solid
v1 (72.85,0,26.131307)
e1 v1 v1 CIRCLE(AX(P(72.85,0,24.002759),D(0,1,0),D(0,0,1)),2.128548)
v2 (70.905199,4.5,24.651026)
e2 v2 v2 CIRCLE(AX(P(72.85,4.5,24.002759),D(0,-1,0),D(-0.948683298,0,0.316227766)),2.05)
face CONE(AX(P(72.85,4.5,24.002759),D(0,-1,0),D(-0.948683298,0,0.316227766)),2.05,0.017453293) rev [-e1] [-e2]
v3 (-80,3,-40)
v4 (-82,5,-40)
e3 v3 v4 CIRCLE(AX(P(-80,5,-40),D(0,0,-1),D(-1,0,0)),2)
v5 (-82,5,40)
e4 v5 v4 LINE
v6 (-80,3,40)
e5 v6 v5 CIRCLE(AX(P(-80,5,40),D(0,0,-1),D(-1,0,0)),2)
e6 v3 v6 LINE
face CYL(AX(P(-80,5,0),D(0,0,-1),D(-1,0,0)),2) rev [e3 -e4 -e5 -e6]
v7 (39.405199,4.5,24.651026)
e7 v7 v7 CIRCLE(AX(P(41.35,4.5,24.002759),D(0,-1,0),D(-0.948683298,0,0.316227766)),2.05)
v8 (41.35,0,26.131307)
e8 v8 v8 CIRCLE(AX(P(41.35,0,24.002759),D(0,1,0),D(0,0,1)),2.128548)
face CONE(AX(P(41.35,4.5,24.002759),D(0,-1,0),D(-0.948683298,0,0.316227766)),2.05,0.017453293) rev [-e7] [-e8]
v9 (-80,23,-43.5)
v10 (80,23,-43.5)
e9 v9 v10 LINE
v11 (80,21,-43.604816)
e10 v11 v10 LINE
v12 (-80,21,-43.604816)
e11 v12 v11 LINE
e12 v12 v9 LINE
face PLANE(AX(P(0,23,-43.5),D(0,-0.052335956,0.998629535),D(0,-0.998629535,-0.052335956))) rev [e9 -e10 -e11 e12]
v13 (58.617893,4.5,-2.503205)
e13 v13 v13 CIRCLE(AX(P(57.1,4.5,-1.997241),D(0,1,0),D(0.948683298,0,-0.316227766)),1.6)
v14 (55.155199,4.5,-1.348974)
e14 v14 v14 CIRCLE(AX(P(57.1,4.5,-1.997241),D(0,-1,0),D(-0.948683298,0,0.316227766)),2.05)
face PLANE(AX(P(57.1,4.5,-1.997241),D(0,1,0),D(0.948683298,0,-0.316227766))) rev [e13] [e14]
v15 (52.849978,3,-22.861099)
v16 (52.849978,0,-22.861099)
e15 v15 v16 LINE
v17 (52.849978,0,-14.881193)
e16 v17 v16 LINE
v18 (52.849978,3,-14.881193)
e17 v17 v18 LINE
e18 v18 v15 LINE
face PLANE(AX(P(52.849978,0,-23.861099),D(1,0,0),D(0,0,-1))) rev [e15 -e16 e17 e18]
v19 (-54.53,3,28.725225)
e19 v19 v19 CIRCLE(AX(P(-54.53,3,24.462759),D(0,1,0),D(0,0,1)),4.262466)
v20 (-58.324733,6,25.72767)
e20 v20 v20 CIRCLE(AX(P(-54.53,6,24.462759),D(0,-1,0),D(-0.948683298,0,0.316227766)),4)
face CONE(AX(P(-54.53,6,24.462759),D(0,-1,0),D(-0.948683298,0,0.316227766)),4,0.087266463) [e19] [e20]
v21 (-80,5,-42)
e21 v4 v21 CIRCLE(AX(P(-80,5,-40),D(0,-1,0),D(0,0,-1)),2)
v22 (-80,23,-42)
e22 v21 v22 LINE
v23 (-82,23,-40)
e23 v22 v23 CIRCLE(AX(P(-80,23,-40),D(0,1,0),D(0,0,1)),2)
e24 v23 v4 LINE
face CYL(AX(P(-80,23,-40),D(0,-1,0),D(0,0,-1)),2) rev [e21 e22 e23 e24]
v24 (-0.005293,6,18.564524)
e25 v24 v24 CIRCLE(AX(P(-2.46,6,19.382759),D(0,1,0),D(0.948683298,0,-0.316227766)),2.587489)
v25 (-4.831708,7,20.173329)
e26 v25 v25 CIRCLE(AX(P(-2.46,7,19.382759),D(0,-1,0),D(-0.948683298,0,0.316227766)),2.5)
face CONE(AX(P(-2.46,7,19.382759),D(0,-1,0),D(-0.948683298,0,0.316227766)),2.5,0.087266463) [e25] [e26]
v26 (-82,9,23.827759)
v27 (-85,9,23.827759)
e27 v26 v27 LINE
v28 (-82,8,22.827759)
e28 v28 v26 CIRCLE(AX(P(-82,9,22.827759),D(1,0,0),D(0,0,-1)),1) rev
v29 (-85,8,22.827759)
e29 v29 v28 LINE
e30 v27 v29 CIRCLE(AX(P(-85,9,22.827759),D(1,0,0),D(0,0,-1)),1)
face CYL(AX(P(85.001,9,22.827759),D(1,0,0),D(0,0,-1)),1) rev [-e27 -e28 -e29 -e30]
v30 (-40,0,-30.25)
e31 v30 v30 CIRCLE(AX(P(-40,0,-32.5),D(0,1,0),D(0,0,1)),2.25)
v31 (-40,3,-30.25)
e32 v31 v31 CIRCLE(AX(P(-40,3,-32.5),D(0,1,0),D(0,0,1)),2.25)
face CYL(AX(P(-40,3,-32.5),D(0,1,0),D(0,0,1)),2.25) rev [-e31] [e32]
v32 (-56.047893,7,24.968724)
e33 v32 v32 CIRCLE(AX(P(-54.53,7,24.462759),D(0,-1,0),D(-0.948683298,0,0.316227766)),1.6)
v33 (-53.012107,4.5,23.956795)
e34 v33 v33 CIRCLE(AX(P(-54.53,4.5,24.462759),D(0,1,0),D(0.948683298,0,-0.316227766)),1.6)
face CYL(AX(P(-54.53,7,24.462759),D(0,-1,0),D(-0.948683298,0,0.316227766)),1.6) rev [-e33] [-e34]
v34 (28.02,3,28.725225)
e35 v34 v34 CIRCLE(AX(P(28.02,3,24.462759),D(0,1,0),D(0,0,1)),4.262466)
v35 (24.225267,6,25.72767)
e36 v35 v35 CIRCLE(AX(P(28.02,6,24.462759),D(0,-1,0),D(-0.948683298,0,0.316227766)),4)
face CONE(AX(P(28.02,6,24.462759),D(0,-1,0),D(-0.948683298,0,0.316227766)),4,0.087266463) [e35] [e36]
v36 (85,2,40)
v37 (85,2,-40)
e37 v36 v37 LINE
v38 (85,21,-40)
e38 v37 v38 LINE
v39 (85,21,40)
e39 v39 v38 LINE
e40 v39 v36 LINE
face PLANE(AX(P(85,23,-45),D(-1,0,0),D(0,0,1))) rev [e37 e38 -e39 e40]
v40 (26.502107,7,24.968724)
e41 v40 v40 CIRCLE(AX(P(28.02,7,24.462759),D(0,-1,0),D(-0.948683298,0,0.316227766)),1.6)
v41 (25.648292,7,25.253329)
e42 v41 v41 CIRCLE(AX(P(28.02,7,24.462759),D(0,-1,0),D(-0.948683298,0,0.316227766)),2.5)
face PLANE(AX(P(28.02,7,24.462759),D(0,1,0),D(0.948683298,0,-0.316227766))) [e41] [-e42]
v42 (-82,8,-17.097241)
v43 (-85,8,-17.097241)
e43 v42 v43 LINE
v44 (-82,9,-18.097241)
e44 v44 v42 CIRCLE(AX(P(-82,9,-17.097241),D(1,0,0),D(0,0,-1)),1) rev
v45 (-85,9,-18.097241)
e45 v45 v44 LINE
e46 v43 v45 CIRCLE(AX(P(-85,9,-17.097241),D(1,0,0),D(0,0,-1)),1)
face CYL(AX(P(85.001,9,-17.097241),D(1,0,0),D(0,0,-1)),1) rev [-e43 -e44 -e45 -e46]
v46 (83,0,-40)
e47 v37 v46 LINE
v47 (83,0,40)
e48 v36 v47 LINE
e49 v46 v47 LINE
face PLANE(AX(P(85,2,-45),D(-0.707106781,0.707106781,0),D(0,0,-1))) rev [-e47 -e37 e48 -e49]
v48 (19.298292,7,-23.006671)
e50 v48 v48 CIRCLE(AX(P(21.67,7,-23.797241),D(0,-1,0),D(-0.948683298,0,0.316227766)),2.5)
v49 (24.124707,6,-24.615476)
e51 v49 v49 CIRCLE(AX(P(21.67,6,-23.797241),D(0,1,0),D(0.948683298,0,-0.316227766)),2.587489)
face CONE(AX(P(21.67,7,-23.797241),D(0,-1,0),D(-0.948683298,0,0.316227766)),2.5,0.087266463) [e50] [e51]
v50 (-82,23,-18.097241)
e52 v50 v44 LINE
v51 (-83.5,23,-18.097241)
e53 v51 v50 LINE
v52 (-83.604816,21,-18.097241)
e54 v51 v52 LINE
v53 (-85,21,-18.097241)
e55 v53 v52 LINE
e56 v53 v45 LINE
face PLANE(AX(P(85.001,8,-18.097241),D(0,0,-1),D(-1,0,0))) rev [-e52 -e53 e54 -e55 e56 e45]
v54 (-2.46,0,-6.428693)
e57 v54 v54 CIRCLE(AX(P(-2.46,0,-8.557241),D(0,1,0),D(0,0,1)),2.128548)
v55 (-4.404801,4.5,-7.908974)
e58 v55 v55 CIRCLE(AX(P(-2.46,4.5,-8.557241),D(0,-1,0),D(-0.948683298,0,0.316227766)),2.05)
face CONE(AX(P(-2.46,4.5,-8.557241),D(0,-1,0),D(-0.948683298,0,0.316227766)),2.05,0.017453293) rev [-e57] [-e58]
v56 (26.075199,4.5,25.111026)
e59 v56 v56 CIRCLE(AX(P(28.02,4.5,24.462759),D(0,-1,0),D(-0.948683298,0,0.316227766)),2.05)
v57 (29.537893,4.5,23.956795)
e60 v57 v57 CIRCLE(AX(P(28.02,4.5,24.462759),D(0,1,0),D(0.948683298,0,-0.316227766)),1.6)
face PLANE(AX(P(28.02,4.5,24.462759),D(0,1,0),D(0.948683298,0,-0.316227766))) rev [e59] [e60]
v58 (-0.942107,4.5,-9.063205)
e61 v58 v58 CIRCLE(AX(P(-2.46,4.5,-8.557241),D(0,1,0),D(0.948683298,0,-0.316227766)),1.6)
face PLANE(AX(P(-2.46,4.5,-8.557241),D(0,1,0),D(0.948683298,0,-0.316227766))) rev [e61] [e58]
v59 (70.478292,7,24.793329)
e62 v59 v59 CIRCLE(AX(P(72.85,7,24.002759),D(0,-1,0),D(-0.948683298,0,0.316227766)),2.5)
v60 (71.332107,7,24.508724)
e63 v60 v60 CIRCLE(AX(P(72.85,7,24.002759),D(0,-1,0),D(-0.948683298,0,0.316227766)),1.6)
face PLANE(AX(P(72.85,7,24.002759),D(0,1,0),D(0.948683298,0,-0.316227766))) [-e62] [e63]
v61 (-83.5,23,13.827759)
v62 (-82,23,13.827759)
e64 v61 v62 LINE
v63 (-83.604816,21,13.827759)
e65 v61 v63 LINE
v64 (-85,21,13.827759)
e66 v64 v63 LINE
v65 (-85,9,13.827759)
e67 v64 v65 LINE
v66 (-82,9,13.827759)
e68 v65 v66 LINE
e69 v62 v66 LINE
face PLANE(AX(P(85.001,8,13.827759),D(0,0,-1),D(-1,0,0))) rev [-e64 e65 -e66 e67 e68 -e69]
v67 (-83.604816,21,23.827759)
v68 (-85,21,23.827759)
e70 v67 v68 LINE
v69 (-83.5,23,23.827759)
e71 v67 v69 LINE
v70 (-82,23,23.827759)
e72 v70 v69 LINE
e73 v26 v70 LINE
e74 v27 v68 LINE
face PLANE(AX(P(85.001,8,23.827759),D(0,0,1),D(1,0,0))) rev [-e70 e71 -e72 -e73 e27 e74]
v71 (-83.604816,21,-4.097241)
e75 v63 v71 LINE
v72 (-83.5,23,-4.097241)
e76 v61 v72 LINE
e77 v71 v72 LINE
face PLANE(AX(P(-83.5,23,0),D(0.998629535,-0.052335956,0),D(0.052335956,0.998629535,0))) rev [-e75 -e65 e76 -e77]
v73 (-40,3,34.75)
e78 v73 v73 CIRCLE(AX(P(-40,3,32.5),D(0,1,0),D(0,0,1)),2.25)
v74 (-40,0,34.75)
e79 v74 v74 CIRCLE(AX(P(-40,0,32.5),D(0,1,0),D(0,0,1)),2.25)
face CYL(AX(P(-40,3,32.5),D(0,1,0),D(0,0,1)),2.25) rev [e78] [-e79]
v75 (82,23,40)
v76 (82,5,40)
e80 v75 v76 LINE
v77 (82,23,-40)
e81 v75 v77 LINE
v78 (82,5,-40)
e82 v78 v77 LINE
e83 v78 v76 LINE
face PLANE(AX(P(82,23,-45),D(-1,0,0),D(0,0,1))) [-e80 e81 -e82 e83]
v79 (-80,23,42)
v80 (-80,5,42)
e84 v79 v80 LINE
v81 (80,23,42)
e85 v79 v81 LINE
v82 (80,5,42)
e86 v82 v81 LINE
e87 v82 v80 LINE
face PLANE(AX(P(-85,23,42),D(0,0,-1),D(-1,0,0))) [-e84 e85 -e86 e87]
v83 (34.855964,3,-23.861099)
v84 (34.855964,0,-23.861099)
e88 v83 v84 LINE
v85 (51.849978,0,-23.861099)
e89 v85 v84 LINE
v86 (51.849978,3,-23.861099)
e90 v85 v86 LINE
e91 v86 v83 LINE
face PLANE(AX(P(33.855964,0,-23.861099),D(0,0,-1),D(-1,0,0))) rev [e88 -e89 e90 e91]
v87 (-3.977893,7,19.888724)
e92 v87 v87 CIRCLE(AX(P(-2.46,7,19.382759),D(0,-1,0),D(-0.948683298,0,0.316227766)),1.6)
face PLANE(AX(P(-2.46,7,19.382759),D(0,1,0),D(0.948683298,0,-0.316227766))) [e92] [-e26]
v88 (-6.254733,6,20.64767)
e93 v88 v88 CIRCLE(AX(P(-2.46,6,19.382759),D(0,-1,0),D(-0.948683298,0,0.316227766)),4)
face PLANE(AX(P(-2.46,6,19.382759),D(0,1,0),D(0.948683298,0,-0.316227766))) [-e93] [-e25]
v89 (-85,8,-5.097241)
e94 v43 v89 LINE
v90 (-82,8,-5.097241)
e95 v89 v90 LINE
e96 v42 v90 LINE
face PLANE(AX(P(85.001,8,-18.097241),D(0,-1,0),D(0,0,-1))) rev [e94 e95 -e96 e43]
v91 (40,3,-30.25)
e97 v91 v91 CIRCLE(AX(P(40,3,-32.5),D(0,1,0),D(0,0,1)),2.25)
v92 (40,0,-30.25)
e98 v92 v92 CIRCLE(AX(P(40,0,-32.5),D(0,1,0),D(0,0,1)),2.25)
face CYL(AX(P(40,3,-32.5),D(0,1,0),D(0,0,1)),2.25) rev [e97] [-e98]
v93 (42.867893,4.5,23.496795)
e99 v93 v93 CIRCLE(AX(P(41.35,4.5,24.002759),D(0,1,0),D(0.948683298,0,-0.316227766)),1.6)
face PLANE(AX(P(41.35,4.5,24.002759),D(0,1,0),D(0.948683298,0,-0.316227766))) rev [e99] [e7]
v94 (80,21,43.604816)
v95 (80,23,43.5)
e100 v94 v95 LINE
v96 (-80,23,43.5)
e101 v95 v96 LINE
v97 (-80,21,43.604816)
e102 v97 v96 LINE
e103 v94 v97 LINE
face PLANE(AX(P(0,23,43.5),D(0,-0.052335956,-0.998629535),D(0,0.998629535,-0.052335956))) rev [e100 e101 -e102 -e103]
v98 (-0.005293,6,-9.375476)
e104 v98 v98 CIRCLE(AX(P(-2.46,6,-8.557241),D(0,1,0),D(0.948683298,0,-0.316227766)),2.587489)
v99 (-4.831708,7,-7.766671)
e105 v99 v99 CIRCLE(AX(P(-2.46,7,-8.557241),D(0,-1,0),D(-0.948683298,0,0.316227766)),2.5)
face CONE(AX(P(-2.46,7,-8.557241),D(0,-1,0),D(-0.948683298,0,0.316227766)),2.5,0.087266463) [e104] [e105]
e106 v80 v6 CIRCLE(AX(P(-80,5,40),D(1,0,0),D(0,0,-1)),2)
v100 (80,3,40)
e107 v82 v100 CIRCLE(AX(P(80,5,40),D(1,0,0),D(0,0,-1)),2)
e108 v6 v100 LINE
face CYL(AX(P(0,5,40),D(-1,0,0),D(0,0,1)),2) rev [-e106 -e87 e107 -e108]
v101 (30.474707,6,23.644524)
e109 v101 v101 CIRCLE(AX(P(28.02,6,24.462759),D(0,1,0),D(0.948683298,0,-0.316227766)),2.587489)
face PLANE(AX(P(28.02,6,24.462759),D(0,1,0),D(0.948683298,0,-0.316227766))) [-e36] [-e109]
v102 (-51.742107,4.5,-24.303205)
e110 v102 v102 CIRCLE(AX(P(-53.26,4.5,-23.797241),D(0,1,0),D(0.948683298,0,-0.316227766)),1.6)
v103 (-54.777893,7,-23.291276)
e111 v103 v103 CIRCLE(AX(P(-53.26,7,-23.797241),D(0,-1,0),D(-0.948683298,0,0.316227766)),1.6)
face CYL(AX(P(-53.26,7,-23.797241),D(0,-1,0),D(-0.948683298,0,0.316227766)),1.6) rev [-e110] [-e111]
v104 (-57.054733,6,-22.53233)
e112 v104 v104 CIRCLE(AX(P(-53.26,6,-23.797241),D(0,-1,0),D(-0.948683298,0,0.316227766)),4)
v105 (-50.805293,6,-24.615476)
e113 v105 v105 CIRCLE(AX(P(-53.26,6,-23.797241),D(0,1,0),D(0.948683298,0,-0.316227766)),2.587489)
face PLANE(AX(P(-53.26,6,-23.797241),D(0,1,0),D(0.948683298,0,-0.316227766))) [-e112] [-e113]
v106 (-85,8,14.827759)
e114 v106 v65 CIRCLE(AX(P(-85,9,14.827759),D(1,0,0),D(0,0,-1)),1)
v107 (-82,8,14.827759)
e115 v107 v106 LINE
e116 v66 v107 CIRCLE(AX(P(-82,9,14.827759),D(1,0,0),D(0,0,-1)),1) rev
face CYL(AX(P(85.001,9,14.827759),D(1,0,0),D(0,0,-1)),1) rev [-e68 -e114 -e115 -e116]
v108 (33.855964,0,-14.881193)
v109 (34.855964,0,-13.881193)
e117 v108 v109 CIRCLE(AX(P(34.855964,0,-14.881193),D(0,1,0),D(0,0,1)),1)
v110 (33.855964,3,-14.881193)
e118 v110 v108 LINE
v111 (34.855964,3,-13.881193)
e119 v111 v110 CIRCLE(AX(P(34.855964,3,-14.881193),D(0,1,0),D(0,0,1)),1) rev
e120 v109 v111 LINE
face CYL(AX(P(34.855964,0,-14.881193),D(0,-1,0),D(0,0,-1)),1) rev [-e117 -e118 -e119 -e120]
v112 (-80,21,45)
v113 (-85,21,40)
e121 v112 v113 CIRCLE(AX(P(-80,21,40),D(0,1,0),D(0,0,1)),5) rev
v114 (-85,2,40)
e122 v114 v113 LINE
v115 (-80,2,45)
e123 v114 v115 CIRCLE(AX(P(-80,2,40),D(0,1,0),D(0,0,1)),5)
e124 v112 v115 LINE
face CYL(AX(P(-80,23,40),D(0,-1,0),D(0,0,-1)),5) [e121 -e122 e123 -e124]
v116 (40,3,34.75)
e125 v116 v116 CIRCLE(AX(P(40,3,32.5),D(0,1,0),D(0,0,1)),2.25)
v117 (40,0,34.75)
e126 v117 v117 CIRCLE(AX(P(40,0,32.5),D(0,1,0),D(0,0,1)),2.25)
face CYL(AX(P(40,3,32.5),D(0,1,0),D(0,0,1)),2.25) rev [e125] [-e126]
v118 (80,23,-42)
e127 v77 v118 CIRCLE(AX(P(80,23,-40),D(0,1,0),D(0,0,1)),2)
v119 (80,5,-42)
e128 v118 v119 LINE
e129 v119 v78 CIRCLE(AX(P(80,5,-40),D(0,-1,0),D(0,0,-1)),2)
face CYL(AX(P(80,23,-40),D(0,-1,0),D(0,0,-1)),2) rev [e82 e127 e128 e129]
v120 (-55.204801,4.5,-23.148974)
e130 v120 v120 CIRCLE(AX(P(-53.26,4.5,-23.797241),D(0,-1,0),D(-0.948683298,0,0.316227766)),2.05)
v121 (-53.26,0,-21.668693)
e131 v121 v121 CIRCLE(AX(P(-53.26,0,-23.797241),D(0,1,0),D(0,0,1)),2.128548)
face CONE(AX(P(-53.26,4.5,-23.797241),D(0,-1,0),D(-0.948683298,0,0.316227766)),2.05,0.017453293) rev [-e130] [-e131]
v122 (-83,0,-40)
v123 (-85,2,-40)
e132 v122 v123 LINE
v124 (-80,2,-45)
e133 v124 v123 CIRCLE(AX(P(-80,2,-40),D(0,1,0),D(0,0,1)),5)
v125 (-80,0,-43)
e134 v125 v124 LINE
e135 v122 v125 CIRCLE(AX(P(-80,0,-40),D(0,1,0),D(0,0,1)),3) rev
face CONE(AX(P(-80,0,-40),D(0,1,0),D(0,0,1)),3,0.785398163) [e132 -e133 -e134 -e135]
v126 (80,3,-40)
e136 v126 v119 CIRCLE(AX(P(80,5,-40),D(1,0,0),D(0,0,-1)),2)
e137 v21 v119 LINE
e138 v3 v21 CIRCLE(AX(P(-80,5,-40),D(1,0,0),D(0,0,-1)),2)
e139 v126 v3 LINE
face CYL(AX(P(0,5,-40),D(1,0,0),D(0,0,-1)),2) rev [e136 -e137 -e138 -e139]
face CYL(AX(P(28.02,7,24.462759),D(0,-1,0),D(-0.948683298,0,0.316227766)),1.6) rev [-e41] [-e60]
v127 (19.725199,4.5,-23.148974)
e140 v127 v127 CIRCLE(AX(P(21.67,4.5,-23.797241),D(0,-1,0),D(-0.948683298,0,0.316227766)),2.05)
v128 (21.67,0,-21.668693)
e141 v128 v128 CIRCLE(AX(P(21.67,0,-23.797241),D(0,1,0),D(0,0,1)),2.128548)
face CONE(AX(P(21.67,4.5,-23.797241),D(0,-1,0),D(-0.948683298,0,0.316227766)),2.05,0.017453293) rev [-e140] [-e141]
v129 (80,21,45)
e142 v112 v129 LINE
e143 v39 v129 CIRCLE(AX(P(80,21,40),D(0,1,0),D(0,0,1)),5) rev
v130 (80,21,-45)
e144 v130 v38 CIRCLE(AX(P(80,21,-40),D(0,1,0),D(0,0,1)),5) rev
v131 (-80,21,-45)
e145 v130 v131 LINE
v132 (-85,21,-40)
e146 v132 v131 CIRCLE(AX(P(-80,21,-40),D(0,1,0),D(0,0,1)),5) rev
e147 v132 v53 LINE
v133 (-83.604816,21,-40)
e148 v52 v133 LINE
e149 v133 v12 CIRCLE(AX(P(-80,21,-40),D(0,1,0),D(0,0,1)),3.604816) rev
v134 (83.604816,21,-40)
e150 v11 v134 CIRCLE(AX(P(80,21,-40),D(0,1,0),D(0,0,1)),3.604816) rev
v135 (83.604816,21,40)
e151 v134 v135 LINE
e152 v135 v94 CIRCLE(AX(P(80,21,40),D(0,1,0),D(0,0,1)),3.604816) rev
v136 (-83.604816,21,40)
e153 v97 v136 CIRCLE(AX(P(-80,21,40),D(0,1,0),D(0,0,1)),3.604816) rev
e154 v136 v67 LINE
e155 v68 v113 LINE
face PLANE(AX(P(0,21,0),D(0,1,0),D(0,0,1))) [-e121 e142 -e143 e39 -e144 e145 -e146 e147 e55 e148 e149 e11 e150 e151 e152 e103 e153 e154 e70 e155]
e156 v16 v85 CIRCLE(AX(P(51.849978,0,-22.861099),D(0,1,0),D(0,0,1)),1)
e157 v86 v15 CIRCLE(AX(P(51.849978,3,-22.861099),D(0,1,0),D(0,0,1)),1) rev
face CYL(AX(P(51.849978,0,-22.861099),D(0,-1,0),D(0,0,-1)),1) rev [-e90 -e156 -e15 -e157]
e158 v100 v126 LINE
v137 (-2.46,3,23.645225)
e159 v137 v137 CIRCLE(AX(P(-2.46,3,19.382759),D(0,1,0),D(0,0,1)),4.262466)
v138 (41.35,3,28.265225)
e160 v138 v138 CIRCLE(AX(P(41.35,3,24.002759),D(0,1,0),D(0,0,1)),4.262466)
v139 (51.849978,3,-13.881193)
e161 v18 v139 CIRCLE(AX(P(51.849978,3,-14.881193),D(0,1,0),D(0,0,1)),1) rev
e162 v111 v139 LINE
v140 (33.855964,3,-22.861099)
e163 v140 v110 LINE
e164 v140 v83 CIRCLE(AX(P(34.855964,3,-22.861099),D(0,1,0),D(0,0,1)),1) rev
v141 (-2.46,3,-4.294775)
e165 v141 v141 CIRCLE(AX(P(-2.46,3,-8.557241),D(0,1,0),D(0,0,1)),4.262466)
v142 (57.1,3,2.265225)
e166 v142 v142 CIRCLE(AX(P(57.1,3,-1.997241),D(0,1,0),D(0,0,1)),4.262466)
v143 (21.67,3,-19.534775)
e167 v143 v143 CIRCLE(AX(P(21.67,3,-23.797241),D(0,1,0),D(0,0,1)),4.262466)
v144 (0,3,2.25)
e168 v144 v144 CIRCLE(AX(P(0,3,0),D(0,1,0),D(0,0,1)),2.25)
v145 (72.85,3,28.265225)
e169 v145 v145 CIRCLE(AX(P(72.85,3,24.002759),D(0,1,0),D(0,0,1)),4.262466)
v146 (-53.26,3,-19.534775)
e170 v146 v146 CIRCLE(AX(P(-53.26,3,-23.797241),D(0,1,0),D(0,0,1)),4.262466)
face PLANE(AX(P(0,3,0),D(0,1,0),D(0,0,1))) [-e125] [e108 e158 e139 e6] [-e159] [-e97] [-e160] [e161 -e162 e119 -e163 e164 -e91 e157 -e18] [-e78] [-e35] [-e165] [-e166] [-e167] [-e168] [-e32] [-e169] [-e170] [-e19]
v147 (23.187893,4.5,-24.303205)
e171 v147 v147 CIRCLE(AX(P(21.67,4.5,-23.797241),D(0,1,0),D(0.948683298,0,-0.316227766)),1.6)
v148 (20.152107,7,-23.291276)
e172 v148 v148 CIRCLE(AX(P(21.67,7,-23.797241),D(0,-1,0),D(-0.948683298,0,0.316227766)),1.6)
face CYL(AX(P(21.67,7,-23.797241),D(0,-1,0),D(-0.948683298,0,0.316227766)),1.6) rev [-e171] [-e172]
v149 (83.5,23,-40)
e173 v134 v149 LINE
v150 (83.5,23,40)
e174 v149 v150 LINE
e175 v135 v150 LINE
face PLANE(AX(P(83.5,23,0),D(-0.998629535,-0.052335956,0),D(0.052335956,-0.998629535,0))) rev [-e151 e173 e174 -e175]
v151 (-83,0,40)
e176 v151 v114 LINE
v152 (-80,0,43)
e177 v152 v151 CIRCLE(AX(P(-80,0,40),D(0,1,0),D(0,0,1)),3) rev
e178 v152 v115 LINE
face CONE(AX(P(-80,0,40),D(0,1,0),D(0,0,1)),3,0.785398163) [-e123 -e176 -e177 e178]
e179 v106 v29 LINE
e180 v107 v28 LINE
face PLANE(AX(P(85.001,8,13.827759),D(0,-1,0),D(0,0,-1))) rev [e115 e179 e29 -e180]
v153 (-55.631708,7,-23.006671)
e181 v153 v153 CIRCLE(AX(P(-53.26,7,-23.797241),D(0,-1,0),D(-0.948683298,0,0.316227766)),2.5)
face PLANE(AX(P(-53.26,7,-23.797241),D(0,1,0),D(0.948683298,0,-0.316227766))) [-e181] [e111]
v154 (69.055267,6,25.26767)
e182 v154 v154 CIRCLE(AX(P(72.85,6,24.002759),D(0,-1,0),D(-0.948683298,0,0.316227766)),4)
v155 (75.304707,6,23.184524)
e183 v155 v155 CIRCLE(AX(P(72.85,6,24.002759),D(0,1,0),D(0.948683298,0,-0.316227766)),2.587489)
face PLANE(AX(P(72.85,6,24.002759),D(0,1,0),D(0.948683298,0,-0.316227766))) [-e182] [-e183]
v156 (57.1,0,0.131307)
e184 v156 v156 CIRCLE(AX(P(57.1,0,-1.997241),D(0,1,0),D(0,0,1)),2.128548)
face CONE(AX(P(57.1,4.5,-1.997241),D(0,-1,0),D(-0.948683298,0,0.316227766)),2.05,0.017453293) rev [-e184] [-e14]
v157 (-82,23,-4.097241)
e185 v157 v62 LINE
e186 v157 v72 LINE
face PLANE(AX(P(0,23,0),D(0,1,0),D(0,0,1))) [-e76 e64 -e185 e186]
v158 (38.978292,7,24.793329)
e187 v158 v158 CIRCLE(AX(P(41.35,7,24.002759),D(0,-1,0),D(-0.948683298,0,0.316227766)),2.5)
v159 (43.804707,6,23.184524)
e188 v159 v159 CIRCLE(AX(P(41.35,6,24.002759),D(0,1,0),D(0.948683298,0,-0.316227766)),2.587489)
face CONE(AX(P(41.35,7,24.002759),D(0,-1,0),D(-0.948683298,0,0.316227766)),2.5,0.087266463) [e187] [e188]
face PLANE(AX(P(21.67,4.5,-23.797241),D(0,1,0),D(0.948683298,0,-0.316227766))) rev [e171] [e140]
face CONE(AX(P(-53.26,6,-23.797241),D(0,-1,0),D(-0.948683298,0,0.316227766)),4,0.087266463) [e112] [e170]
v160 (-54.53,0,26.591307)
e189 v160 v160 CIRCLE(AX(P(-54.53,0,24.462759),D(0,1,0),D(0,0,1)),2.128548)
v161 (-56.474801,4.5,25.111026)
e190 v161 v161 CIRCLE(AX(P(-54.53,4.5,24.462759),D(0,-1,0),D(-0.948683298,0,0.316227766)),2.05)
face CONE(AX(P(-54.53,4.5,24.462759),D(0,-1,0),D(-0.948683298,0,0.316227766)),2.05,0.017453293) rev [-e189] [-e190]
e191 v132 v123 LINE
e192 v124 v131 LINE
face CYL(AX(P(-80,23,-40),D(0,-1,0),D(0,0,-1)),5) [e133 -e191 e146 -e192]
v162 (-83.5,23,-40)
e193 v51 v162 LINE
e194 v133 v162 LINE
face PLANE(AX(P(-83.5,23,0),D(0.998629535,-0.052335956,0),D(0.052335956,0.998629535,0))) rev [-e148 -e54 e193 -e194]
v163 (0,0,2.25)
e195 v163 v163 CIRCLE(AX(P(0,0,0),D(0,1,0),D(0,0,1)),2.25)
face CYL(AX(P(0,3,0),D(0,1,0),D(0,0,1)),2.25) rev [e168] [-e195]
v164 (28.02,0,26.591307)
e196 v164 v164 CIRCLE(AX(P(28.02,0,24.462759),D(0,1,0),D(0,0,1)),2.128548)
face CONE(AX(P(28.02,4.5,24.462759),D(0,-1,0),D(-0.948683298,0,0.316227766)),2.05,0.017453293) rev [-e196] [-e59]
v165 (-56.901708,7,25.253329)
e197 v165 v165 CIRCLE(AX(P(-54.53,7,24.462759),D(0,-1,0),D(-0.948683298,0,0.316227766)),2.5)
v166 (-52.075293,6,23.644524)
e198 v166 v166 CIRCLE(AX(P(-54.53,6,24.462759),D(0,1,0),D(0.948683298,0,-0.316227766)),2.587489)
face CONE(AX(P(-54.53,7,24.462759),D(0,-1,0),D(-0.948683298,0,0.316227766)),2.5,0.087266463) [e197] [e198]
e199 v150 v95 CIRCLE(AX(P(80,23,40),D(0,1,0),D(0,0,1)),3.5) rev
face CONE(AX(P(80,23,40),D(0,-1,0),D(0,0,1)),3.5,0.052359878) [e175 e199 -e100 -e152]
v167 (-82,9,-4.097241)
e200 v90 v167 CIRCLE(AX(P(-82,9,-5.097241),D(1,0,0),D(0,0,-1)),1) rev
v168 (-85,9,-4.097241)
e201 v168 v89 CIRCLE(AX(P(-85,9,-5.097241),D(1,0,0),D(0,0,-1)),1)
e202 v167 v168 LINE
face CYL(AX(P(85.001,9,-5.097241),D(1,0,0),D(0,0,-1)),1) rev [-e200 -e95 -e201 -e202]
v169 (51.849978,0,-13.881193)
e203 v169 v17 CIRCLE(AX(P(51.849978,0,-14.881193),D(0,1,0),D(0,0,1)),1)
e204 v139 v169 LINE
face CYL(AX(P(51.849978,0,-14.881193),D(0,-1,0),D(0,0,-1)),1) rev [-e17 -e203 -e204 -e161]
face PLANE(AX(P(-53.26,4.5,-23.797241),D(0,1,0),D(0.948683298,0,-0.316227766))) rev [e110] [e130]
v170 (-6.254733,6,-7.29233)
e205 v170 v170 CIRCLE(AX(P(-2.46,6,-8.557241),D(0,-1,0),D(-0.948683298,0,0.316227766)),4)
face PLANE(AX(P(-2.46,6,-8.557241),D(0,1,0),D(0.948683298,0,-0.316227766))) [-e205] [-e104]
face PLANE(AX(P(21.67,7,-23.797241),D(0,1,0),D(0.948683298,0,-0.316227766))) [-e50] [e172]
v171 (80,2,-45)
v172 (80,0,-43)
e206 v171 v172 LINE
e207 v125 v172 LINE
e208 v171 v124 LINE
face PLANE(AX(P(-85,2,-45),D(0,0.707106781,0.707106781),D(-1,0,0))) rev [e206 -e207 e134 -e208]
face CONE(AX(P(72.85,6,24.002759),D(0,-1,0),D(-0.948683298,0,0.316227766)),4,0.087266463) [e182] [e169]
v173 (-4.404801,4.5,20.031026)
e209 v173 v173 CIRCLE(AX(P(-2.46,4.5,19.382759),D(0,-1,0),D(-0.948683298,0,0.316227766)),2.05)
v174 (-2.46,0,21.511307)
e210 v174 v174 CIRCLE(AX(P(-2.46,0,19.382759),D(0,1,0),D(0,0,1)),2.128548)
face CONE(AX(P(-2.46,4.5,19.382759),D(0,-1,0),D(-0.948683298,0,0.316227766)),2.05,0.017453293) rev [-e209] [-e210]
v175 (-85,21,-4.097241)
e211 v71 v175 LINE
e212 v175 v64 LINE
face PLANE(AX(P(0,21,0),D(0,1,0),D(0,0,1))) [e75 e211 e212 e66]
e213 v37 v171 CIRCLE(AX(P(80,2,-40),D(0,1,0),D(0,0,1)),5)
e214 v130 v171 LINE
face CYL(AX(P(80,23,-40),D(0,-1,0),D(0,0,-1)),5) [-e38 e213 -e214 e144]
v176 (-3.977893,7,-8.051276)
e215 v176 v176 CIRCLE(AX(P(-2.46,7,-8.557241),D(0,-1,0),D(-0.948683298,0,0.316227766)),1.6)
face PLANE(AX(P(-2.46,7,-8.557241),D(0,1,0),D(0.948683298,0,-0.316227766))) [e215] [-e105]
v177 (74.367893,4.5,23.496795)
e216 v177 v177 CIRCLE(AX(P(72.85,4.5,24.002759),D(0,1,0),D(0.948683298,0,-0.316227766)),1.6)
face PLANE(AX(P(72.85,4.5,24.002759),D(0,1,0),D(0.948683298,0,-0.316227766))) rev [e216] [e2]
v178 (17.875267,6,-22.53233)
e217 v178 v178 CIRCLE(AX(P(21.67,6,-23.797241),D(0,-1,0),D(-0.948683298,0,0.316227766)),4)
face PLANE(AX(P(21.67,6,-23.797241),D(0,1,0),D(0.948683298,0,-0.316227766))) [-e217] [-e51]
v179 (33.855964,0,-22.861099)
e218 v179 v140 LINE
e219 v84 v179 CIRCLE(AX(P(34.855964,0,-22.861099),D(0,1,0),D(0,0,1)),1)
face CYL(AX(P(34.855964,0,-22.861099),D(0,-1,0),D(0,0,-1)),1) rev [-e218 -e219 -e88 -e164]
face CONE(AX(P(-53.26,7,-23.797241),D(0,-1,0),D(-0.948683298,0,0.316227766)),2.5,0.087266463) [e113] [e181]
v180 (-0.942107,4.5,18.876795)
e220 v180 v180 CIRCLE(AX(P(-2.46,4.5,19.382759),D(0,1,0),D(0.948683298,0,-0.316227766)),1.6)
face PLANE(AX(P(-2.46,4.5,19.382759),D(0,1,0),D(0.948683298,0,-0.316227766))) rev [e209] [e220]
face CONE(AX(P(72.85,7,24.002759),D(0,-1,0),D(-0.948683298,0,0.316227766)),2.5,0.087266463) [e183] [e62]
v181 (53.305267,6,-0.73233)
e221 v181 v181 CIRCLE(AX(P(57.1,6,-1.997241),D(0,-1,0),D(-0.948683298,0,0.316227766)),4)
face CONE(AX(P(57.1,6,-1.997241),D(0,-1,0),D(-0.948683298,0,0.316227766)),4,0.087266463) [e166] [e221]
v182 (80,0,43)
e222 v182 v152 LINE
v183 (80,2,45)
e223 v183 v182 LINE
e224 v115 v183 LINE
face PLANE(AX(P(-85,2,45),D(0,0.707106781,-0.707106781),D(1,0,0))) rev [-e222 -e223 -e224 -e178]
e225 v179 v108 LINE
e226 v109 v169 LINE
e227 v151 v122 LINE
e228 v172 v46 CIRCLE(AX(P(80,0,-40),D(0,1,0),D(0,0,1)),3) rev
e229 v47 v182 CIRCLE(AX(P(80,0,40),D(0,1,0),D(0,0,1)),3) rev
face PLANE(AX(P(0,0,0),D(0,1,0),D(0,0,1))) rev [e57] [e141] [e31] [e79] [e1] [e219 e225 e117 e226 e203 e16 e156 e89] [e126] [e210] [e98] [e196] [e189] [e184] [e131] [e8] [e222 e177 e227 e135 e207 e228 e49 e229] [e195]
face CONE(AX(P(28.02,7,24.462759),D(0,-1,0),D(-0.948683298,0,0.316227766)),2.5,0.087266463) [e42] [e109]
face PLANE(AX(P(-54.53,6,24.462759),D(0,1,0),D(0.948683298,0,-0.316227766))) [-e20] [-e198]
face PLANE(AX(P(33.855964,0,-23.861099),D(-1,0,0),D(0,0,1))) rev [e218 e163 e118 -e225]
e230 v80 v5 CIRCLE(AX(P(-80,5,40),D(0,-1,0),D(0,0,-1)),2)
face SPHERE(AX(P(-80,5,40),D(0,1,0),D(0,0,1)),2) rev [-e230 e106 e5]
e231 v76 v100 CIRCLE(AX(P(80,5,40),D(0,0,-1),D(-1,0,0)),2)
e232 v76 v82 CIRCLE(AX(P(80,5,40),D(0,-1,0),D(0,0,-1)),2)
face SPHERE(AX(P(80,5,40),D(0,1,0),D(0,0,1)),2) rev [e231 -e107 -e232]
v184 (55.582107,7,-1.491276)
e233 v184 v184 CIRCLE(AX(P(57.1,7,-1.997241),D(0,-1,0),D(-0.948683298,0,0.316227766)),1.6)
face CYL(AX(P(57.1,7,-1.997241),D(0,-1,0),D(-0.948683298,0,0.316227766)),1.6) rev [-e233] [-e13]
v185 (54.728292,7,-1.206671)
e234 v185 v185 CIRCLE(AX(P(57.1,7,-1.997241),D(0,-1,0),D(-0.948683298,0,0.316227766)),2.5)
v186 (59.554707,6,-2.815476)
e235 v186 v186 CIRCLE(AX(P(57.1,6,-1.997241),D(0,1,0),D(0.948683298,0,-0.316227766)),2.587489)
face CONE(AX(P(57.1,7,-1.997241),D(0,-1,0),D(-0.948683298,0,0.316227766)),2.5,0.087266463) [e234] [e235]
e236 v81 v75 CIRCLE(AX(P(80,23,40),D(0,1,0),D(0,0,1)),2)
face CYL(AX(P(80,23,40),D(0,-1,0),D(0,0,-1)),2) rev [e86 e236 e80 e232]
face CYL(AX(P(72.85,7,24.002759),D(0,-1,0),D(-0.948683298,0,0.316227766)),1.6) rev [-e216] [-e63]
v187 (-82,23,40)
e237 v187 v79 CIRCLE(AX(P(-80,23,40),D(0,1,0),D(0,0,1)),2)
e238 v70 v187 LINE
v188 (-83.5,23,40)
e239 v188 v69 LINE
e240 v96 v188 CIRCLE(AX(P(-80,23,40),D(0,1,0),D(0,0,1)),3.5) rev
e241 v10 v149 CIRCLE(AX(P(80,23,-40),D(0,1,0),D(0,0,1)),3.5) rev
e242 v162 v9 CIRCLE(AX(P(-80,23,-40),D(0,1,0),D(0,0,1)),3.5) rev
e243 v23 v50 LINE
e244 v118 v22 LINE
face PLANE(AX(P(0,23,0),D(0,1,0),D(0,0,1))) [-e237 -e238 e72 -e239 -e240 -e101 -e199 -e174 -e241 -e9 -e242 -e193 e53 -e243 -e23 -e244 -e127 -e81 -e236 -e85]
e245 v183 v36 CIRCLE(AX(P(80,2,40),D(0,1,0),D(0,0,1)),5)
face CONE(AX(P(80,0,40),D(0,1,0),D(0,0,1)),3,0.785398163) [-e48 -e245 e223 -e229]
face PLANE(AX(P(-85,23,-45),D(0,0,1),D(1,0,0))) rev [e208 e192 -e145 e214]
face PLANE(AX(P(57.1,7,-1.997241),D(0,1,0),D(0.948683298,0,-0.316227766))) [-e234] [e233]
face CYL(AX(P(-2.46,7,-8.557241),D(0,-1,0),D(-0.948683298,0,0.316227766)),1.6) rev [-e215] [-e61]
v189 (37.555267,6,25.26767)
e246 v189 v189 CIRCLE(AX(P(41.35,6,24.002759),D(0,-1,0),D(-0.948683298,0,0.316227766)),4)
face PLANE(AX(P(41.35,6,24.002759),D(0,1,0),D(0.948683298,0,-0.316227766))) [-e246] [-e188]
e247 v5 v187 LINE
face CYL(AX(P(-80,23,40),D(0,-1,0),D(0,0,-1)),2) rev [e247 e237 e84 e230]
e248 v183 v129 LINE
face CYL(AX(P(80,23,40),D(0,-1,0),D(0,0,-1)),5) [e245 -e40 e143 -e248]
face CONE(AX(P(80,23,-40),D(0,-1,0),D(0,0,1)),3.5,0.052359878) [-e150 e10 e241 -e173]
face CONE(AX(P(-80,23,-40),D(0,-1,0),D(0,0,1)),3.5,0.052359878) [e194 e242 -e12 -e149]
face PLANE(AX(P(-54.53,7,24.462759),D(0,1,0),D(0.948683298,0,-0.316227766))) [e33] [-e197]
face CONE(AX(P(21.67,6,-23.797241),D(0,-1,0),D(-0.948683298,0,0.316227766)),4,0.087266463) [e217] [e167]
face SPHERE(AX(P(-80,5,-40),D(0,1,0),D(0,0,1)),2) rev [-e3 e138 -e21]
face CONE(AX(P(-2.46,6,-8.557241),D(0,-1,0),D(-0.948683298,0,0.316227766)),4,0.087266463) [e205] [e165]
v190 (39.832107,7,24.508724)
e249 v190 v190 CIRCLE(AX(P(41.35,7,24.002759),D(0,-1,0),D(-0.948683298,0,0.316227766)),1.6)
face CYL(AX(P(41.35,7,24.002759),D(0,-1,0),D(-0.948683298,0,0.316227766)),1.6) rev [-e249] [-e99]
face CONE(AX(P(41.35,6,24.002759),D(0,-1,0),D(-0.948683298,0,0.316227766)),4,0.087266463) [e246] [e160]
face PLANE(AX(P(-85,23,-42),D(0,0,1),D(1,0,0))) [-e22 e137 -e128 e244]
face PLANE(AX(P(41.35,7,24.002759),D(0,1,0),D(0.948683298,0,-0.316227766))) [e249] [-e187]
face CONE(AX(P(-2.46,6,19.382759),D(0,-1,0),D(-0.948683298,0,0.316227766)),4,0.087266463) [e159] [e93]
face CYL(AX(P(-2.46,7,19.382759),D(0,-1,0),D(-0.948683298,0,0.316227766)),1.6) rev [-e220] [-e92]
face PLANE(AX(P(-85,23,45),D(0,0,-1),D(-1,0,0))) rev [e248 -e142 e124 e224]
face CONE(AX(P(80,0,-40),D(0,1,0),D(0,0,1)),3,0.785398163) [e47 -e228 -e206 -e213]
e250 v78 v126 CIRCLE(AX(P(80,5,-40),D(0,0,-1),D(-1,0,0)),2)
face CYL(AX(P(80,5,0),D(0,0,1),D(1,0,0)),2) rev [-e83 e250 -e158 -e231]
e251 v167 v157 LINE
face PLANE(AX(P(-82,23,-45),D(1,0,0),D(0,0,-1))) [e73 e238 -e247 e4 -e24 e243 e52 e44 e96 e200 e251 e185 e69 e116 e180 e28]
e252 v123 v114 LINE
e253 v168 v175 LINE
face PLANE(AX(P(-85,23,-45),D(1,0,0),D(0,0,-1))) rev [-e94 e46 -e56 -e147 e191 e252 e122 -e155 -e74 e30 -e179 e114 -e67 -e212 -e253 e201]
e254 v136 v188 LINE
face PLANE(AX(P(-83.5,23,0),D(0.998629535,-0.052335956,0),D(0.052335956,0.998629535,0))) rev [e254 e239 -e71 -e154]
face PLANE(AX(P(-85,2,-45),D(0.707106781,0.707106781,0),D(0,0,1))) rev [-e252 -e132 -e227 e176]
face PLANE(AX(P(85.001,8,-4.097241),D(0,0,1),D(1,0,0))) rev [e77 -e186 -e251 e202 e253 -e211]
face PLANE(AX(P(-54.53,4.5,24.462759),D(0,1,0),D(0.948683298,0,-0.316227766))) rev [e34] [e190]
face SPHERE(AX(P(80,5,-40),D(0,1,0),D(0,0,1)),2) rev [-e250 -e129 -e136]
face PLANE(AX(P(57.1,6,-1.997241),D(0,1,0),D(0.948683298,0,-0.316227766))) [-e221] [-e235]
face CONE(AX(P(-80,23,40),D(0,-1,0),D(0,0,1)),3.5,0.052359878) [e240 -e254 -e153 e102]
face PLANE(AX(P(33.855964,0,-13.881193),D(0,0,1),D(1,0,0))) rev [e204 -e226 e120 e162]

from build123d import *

# Parameters (mm, degrees)
CROQUIS2_W                         = 170
CROQUIS2_H                         = 90
SALIENTE_EXTRUIR1_DEPTH            = 23
REDONDEO1_R                        = 5
VACIADO1_T                         = -3
REDONDEO4_R                        = 2
CHAFL_N1_SIZE                      = 2
CORTAR_EXTRUIR1_REACH              = 179.353
CROQUIS3_W                         = 14
CROQUIS3_H                         = 19.902430744
CROQUIS3_W_2                       = 10
CROQUIS3_H_2                       = 25.118860909
REDONDEO2_R                        = 1
CROQUIS4_W                         = 18.994013978
CROQUIS4_H                         = 9.979905649
CORTAR_EXTRUIR2_DEPTH              = 99.234413522
REDONDEO3_R                        = 1
SELECCIONAR_OPERACIONES1_OUTLINE_W = 1.395184441
SELECCIONAR_OPERACIONES1_OUTLINE_H = 17.925
SELECCIONAR_OPERACIONES1_DEPTH     = 2
SELECCIONAR_OPERACIONES1_DRAFT     = -3
SELECCIONAR_OPERACIONES1_2_DEPTH   = 2
SELECCIONAR_OPERACIONES1_2_DRAFT   = -3
TALADRO_DE_MARGEN_PARA_M41_D       = 4.5


# Read off the part's stored shape, not the designer's step: Saliente de montaje5, Seleccionar operaciones1
with BuildPart() as part:
    # Croquis2 → Saliente-Extruir1 (new body)
    with BuildSketch(Plane(origin=(0, 0, 0), x_dir=(1, 0, 0), z_dir=(0, 1, 0))):
        Rectangle(CROQUIS2_W, CROQUIS2_H)
    extrude(amount=SALIENTE_EXTRUIR1_DEPTH)

    # Redondeo1
    redondeo1_edges = [part.edges().sort_by_distance(p)[0] for p in [
        (85, 11.5, 45),
        (-85, 11.5, 45),
        (-85, 11.5, -45),
        (85, 11.5, -45),
    ]]
    fillet(redondeo1_edges, radius=REDONDEO1_R)

    # Vaciado1
    vaciado1_openings = [part.faces().sort_by_distance(p)[0] for p in [
        (0, 23, 0),
    ]]
    offset(amount=VACIADO1_T, openings=vaciado1_openings, kind=Kind.INTERSECTION)

    # Redondeo4
    redondeo4_edges = [part.edges().sort_by_distance(p)[0] for p in [
        (82, 3, 0),
        (0, 3, -42),
        (-82, 3, 0),
        (0, 3, 42),
        (81.414213562, 3, 41.414213562),
        (-81.414213562, 3, 41.414213562),
        (-81.414213562, 3, -41.414213562),
        (81.414213562, 3, -41.414213562),
    ]]
    fillet(redondeo4_edges, radius=REDONDEO4_R)

    # Chaflán1
    chafl_n1_edges = [part.edges().sort_by_distance(p)[0] for p in [
        (85, 0, 0),
        (0, 0, 45),
        (-85, 0, 0),
        (0, 0, -45),
        (-83.535533906, 0, 43.535533906),
        (-83.535533906, 0, -43.535533906),
        (83.535533906, 0, -43.535533906),
        (83.535533906, 0, 43.535533906),
    ]]
    chamfer(chafl_n1_edges, length=CHAFL_N1_SIZE)

    # Saliente de montaje5 outline → Saliente de montaje5 (revolve, cut)
    with BuildSketch(Plane(origin=(-54.53, 0, 24.462759338), x_dir=(1, 0, 0), z_dir=(0, 0, 1))):
        Polygon((2.128547792, 0), (2.076182597, 3), (0, 3), (0, 0), align=None)
    saliente_de_montaje5 = revolve(axis=Axis((-54.53, 0, 24.462759338), (0, 1, 0)), mode=Mode.SUBTRACT)

    # Saliente de montaje5 2 outline → Saliente de montaje5 2 (revolve)
    with BuildSketch(Plane(origin=(-54.53, 0, 24.462759338), x_dir=(1, 0, 0), z_dir=(0, 0, 1))):
        Polygon((4, 6), (2.587488664, 6), (2.5, 7), (1.6, 7), (1.6, 4.5), (2.05, 4.5), (2.076182597, 3), (4.262465991, 3), align=None)
    saliente_de_montaje5_2 = revolve(axis=Axis((-54.53, 0, 24.462759338), (0, 1, 0)))

    # Matriz de croquis1: Saliente de montaje5, Saliente de montaje5 2 at 8 more places
    with Locations((1.27, 0, -48.26), (52.07, 0, -33.02), (52.07, 0, -5.08), (82.55, 0, 0), (76.2, 0, -48.26), (111.63, 0, -26.46), (95.88, 0, -0.46), (127.38, 0, -0.46)):
        add(saliente_de_montaje5, mode=Mode.SUBTRACT)
        add(saliente_de_montaje5_2)

    # Croquis3 → Cortar-Extruir1 (cut, up to next)
    with BuildSketch(Plane.ZY.offset(85), mode=Mode.PRIVATE) as cortar_extruir1_sk1:
        with Locations((-11.097240662, 17.951215372)):
            Rectangle(CROQUIS3_W, CROQUIS3_H)
    cortar_extruir1_tool1 = extrude(cortar_extruir1_sk1.sketch, amount=-CORTAR_EXTRUIR1_REACH, mode=Mode.PRIVATE) & part.part
    # Croquis3 → Cortar-Extruir1 (cut, up to next)
    with BuildSketch(Plane.ZY.offset(85), mode=Mode.PRIVATE) as cortar_extruir1_sk2:
        with Locations((18.827759338, 20.559430454)):
            Rectangle(CROQUIS3_W_2, CROQUIS3_H_2)
    cortar_extruir1_tool2 = extrude(cortar_extruir1_sk2.sketch, amount=-CORTAR_EXTRUIR1_REACH, mode=Mode.PRIVATE) & part.part
    add(cortar_extruir1_tool1.solids().sort_by_distance((-85, 17.951215, -11.097241))[0], mode=Mode.SUBTRACT)
    add(cortar_extruir1_tool2.solids().sort_by_distance((-85, 20.55943, 18.827759))[0], mode=Mode.SUBTRACT)

    # Redondeo2
    redondeo2_edges = [part.edges().sort_by_distance(p)[0] for p in [
        (-83.5, 8, -4.097240662),
        (-83.5, 8, -18.097240662),
        (-83.5, 8, 23.827759338),
        (-83.5, 8, 13.827759338),
    ]]
    fillet(redondeo2_edges, radius=REDONDEO2_R)

    # Croquis4 → Cortar-Extruir2 (cut, through all)
    with BuildSketch(Plane(origin=(0, 3, 0), x_dir=(1, 0, 0), z_dir=(0, 1, 0))):
        with Locations((43.352971059, 18.87114604)):
            Rectangle(CROQUIS4_W, CROQUIS4_H)
    extrude(amount=-CORTAR_EXTRUIR2_DEPTH, mode=Mode.SUBTRACT)

    # Redondeo3
    redondeo3_edges = [part.edges().sort_by_distance(p)[0] for p in [
        (52.849978048, 1.5, -23.861098864),
        (52.849978048, 1.5, -13.881193215),
        (33.85596407, 1.5, -13.881193215),
        (33.85596407, 1.5, -23.861098864),
    ]]
    fillet(redondeo3_edges, radius=REDONDEO3_R)


with BuildPart() as seleccionar_operaciones1_tool:
    # Seleccionar operaciones1 outline → Seleccionar operaciones1 (with draft: the straight prism first)
    with BuildSketch(Plane(origin=(0, 21, 0), x_dir=(1, 0, 0), z_dir=(0, 1, 0))):
        with Locations((-84.30240778, -4.865259338)):
            Rectangle(SELECCIONAR_OPERACIONES1_OUTLINE_W, SELECCIONAR_OPERACIONES1_OUTLINE_H)
    extrude(amount=SELECCIONAR_OPERACIONES1_DEPTH)
    # Seleccionar operaciones1: the draft: its side faces are tilted about the plane it starts from
    seleccionar_operaciones1_sides = [seleccionar_operaciones1_tool.faces().sort_by_distance(p)[0] for p in [
        (-84.30240778, 22, 13.827759338),
        (-83.604815559, 22, 4.865259338),
        (-84.30240778, 22, -4.097240662),
        (-85, 22, 4.865259338),
    ]]
    draft(seleccionar_operaciones1_sides, Plane(origin=(0, 21, 0), x_dir=(1, 0, 0), z_dir=(0, 1, 0)), SELECCIONAR_OPERACIONES1_DRAFT)


with BuildPart() as part_1:
    add(part.part)

    # Seleccionar operaciones1: cut by seleccionar_operaciones1_tool
    add(seleccionar_operaciones1_tool.part, mode=Mode.SUBTRACT)


with BuildPart() as seleccionar_operaciones1_2_tool:
    # Seleccionar operaciones1 2 outline → Seleccionar operaciones1 2 (with draft: the straight prism first)
    with BuildSketch(Plane(origin=(0, 21, 0), x_dir=(1, 0, 0), z_dir=(0, 1, 0))):
        with BuildLine():
            Line((-83.604815559, -23.827759338), (-85, -23.827759338))
            Line((-85, -23.827759338), (-85, -40))
            ThreePointArc((-85, -40), (-83.535533906, -43.535533906), (-80, -45))
            Line((-80, -45), (80, -45))
            ThreePointArc((80, -45), (83.535533906, -43.535533906), (85, -40))
            Line((85, -40), (85, 40))
            ThreePointArc((85, 40), (83.535533906, 43.535533906), (80, 45))
            Line((80, 45), (-80, 45))
            ThreePointArc((-80, 45), (-83.535533906, 43.535533906), (-85, 40))
            Line((-85, 40), (-85, 18.097240662))
            Line((-85, 18.097240662), (-83.604815559, 18.097240662))
            Line((-83.604815559, 18.097240662), (-83.604815559, 40))
            ThreePointArc((-83.604815559, 40), (-82.548989526, 42.548989526), (-80, 43.604815559))
            Line((-80, 43.604815559), (80, 43.604815559))
            ThreePointArc((80, 43.604815559), (82.548989526, 42.548989526), (83.604815559, 40))
            Line((83.604815559, 40), (83.604815559, -40))
            ThreePointArc((83.604815559, -40), (82.548989526, -42.548989526), (80, -43.604815559))
            Line((80, -43.604815559), (-80, -43.604815559))
            ThreePointArc((-80, -43.604815559), (-82.548989526, -42.548989526), (-83.604815559, -40))
            Line((-83.604815559, -40), (-83.604815559, -23.827759338))
        make_face()
    extrude(amount=SELECCIONAR_OPERACIONES1_2_DEPTH)
    # Seleccionar operaciones1 2: the draft: its side faces are tilted about the plane it starts from
    seleccionar_operaciones1_2_sides = [seleccionar_operaciones1_2_tool.faces().sort_by_distance(p)[0] for p in [
        (-82.548989526, 22, 42.548989526),
        (-83.604815559, 22, 31.913879669),
        (-84.30240778, 22, 23.827759338),
        (-85, 22, 31.913879669),
        (-83.535533906, 22, 43.535533906),
        (0, 22, 45),
        (83.535533906, 22, 43.535533906),
        (85, 22, 0),
        (83.535533906, 22, -43.535533906),
        (0, 22, -45),
        (-83.535533906, 22, -43.535533906),
        (-85, 22, -29.048620331),
        (-84.30240778, 22, -18.097240662),
        (-83.604815559, 22, -29.048620331),
        (-82.548989526, 22, -42.548989526),
        (0, 22, -43.604815559),
        (82.548989526, 22, -42.548989526),
        (83.604815559, 22, 0),
        (82.548989526, 22, 42.548989526),
        (0, 22, 43.604815559),
    ]]
    draft(seleccionar_operaciones1_2_sides, Plane(origin=(0, 21, 0), x_dir=(1, 0, 0), z_dir=(0, 1, 0)), SELECCIONAR_OPERACIONES1_2_DRAFT)


with BuildPart() as part_2:
    add(part_1.part)

    # Seleccionar operaciones1 2: cut by seleccionar_operaciones1_2_tool
    add(seleccionar_operaciones1_2_tool.part, mode=Mode.SUBTRACT)

    # Taladro de margen para M41 (through all)
    with Locations(Plane(origin=(0, 3, 0), x_dir=(1, 0, 0), z_dir=(0, 1, 0))):
        with Locations((0, 0), (40, -32.5), (-40, 32.5), (-40, -32.5), (40, 32.5)):
            Hole(TALADRO_DE_MARGEN_PARA_M41_D / 2)


solid = part_2.part
